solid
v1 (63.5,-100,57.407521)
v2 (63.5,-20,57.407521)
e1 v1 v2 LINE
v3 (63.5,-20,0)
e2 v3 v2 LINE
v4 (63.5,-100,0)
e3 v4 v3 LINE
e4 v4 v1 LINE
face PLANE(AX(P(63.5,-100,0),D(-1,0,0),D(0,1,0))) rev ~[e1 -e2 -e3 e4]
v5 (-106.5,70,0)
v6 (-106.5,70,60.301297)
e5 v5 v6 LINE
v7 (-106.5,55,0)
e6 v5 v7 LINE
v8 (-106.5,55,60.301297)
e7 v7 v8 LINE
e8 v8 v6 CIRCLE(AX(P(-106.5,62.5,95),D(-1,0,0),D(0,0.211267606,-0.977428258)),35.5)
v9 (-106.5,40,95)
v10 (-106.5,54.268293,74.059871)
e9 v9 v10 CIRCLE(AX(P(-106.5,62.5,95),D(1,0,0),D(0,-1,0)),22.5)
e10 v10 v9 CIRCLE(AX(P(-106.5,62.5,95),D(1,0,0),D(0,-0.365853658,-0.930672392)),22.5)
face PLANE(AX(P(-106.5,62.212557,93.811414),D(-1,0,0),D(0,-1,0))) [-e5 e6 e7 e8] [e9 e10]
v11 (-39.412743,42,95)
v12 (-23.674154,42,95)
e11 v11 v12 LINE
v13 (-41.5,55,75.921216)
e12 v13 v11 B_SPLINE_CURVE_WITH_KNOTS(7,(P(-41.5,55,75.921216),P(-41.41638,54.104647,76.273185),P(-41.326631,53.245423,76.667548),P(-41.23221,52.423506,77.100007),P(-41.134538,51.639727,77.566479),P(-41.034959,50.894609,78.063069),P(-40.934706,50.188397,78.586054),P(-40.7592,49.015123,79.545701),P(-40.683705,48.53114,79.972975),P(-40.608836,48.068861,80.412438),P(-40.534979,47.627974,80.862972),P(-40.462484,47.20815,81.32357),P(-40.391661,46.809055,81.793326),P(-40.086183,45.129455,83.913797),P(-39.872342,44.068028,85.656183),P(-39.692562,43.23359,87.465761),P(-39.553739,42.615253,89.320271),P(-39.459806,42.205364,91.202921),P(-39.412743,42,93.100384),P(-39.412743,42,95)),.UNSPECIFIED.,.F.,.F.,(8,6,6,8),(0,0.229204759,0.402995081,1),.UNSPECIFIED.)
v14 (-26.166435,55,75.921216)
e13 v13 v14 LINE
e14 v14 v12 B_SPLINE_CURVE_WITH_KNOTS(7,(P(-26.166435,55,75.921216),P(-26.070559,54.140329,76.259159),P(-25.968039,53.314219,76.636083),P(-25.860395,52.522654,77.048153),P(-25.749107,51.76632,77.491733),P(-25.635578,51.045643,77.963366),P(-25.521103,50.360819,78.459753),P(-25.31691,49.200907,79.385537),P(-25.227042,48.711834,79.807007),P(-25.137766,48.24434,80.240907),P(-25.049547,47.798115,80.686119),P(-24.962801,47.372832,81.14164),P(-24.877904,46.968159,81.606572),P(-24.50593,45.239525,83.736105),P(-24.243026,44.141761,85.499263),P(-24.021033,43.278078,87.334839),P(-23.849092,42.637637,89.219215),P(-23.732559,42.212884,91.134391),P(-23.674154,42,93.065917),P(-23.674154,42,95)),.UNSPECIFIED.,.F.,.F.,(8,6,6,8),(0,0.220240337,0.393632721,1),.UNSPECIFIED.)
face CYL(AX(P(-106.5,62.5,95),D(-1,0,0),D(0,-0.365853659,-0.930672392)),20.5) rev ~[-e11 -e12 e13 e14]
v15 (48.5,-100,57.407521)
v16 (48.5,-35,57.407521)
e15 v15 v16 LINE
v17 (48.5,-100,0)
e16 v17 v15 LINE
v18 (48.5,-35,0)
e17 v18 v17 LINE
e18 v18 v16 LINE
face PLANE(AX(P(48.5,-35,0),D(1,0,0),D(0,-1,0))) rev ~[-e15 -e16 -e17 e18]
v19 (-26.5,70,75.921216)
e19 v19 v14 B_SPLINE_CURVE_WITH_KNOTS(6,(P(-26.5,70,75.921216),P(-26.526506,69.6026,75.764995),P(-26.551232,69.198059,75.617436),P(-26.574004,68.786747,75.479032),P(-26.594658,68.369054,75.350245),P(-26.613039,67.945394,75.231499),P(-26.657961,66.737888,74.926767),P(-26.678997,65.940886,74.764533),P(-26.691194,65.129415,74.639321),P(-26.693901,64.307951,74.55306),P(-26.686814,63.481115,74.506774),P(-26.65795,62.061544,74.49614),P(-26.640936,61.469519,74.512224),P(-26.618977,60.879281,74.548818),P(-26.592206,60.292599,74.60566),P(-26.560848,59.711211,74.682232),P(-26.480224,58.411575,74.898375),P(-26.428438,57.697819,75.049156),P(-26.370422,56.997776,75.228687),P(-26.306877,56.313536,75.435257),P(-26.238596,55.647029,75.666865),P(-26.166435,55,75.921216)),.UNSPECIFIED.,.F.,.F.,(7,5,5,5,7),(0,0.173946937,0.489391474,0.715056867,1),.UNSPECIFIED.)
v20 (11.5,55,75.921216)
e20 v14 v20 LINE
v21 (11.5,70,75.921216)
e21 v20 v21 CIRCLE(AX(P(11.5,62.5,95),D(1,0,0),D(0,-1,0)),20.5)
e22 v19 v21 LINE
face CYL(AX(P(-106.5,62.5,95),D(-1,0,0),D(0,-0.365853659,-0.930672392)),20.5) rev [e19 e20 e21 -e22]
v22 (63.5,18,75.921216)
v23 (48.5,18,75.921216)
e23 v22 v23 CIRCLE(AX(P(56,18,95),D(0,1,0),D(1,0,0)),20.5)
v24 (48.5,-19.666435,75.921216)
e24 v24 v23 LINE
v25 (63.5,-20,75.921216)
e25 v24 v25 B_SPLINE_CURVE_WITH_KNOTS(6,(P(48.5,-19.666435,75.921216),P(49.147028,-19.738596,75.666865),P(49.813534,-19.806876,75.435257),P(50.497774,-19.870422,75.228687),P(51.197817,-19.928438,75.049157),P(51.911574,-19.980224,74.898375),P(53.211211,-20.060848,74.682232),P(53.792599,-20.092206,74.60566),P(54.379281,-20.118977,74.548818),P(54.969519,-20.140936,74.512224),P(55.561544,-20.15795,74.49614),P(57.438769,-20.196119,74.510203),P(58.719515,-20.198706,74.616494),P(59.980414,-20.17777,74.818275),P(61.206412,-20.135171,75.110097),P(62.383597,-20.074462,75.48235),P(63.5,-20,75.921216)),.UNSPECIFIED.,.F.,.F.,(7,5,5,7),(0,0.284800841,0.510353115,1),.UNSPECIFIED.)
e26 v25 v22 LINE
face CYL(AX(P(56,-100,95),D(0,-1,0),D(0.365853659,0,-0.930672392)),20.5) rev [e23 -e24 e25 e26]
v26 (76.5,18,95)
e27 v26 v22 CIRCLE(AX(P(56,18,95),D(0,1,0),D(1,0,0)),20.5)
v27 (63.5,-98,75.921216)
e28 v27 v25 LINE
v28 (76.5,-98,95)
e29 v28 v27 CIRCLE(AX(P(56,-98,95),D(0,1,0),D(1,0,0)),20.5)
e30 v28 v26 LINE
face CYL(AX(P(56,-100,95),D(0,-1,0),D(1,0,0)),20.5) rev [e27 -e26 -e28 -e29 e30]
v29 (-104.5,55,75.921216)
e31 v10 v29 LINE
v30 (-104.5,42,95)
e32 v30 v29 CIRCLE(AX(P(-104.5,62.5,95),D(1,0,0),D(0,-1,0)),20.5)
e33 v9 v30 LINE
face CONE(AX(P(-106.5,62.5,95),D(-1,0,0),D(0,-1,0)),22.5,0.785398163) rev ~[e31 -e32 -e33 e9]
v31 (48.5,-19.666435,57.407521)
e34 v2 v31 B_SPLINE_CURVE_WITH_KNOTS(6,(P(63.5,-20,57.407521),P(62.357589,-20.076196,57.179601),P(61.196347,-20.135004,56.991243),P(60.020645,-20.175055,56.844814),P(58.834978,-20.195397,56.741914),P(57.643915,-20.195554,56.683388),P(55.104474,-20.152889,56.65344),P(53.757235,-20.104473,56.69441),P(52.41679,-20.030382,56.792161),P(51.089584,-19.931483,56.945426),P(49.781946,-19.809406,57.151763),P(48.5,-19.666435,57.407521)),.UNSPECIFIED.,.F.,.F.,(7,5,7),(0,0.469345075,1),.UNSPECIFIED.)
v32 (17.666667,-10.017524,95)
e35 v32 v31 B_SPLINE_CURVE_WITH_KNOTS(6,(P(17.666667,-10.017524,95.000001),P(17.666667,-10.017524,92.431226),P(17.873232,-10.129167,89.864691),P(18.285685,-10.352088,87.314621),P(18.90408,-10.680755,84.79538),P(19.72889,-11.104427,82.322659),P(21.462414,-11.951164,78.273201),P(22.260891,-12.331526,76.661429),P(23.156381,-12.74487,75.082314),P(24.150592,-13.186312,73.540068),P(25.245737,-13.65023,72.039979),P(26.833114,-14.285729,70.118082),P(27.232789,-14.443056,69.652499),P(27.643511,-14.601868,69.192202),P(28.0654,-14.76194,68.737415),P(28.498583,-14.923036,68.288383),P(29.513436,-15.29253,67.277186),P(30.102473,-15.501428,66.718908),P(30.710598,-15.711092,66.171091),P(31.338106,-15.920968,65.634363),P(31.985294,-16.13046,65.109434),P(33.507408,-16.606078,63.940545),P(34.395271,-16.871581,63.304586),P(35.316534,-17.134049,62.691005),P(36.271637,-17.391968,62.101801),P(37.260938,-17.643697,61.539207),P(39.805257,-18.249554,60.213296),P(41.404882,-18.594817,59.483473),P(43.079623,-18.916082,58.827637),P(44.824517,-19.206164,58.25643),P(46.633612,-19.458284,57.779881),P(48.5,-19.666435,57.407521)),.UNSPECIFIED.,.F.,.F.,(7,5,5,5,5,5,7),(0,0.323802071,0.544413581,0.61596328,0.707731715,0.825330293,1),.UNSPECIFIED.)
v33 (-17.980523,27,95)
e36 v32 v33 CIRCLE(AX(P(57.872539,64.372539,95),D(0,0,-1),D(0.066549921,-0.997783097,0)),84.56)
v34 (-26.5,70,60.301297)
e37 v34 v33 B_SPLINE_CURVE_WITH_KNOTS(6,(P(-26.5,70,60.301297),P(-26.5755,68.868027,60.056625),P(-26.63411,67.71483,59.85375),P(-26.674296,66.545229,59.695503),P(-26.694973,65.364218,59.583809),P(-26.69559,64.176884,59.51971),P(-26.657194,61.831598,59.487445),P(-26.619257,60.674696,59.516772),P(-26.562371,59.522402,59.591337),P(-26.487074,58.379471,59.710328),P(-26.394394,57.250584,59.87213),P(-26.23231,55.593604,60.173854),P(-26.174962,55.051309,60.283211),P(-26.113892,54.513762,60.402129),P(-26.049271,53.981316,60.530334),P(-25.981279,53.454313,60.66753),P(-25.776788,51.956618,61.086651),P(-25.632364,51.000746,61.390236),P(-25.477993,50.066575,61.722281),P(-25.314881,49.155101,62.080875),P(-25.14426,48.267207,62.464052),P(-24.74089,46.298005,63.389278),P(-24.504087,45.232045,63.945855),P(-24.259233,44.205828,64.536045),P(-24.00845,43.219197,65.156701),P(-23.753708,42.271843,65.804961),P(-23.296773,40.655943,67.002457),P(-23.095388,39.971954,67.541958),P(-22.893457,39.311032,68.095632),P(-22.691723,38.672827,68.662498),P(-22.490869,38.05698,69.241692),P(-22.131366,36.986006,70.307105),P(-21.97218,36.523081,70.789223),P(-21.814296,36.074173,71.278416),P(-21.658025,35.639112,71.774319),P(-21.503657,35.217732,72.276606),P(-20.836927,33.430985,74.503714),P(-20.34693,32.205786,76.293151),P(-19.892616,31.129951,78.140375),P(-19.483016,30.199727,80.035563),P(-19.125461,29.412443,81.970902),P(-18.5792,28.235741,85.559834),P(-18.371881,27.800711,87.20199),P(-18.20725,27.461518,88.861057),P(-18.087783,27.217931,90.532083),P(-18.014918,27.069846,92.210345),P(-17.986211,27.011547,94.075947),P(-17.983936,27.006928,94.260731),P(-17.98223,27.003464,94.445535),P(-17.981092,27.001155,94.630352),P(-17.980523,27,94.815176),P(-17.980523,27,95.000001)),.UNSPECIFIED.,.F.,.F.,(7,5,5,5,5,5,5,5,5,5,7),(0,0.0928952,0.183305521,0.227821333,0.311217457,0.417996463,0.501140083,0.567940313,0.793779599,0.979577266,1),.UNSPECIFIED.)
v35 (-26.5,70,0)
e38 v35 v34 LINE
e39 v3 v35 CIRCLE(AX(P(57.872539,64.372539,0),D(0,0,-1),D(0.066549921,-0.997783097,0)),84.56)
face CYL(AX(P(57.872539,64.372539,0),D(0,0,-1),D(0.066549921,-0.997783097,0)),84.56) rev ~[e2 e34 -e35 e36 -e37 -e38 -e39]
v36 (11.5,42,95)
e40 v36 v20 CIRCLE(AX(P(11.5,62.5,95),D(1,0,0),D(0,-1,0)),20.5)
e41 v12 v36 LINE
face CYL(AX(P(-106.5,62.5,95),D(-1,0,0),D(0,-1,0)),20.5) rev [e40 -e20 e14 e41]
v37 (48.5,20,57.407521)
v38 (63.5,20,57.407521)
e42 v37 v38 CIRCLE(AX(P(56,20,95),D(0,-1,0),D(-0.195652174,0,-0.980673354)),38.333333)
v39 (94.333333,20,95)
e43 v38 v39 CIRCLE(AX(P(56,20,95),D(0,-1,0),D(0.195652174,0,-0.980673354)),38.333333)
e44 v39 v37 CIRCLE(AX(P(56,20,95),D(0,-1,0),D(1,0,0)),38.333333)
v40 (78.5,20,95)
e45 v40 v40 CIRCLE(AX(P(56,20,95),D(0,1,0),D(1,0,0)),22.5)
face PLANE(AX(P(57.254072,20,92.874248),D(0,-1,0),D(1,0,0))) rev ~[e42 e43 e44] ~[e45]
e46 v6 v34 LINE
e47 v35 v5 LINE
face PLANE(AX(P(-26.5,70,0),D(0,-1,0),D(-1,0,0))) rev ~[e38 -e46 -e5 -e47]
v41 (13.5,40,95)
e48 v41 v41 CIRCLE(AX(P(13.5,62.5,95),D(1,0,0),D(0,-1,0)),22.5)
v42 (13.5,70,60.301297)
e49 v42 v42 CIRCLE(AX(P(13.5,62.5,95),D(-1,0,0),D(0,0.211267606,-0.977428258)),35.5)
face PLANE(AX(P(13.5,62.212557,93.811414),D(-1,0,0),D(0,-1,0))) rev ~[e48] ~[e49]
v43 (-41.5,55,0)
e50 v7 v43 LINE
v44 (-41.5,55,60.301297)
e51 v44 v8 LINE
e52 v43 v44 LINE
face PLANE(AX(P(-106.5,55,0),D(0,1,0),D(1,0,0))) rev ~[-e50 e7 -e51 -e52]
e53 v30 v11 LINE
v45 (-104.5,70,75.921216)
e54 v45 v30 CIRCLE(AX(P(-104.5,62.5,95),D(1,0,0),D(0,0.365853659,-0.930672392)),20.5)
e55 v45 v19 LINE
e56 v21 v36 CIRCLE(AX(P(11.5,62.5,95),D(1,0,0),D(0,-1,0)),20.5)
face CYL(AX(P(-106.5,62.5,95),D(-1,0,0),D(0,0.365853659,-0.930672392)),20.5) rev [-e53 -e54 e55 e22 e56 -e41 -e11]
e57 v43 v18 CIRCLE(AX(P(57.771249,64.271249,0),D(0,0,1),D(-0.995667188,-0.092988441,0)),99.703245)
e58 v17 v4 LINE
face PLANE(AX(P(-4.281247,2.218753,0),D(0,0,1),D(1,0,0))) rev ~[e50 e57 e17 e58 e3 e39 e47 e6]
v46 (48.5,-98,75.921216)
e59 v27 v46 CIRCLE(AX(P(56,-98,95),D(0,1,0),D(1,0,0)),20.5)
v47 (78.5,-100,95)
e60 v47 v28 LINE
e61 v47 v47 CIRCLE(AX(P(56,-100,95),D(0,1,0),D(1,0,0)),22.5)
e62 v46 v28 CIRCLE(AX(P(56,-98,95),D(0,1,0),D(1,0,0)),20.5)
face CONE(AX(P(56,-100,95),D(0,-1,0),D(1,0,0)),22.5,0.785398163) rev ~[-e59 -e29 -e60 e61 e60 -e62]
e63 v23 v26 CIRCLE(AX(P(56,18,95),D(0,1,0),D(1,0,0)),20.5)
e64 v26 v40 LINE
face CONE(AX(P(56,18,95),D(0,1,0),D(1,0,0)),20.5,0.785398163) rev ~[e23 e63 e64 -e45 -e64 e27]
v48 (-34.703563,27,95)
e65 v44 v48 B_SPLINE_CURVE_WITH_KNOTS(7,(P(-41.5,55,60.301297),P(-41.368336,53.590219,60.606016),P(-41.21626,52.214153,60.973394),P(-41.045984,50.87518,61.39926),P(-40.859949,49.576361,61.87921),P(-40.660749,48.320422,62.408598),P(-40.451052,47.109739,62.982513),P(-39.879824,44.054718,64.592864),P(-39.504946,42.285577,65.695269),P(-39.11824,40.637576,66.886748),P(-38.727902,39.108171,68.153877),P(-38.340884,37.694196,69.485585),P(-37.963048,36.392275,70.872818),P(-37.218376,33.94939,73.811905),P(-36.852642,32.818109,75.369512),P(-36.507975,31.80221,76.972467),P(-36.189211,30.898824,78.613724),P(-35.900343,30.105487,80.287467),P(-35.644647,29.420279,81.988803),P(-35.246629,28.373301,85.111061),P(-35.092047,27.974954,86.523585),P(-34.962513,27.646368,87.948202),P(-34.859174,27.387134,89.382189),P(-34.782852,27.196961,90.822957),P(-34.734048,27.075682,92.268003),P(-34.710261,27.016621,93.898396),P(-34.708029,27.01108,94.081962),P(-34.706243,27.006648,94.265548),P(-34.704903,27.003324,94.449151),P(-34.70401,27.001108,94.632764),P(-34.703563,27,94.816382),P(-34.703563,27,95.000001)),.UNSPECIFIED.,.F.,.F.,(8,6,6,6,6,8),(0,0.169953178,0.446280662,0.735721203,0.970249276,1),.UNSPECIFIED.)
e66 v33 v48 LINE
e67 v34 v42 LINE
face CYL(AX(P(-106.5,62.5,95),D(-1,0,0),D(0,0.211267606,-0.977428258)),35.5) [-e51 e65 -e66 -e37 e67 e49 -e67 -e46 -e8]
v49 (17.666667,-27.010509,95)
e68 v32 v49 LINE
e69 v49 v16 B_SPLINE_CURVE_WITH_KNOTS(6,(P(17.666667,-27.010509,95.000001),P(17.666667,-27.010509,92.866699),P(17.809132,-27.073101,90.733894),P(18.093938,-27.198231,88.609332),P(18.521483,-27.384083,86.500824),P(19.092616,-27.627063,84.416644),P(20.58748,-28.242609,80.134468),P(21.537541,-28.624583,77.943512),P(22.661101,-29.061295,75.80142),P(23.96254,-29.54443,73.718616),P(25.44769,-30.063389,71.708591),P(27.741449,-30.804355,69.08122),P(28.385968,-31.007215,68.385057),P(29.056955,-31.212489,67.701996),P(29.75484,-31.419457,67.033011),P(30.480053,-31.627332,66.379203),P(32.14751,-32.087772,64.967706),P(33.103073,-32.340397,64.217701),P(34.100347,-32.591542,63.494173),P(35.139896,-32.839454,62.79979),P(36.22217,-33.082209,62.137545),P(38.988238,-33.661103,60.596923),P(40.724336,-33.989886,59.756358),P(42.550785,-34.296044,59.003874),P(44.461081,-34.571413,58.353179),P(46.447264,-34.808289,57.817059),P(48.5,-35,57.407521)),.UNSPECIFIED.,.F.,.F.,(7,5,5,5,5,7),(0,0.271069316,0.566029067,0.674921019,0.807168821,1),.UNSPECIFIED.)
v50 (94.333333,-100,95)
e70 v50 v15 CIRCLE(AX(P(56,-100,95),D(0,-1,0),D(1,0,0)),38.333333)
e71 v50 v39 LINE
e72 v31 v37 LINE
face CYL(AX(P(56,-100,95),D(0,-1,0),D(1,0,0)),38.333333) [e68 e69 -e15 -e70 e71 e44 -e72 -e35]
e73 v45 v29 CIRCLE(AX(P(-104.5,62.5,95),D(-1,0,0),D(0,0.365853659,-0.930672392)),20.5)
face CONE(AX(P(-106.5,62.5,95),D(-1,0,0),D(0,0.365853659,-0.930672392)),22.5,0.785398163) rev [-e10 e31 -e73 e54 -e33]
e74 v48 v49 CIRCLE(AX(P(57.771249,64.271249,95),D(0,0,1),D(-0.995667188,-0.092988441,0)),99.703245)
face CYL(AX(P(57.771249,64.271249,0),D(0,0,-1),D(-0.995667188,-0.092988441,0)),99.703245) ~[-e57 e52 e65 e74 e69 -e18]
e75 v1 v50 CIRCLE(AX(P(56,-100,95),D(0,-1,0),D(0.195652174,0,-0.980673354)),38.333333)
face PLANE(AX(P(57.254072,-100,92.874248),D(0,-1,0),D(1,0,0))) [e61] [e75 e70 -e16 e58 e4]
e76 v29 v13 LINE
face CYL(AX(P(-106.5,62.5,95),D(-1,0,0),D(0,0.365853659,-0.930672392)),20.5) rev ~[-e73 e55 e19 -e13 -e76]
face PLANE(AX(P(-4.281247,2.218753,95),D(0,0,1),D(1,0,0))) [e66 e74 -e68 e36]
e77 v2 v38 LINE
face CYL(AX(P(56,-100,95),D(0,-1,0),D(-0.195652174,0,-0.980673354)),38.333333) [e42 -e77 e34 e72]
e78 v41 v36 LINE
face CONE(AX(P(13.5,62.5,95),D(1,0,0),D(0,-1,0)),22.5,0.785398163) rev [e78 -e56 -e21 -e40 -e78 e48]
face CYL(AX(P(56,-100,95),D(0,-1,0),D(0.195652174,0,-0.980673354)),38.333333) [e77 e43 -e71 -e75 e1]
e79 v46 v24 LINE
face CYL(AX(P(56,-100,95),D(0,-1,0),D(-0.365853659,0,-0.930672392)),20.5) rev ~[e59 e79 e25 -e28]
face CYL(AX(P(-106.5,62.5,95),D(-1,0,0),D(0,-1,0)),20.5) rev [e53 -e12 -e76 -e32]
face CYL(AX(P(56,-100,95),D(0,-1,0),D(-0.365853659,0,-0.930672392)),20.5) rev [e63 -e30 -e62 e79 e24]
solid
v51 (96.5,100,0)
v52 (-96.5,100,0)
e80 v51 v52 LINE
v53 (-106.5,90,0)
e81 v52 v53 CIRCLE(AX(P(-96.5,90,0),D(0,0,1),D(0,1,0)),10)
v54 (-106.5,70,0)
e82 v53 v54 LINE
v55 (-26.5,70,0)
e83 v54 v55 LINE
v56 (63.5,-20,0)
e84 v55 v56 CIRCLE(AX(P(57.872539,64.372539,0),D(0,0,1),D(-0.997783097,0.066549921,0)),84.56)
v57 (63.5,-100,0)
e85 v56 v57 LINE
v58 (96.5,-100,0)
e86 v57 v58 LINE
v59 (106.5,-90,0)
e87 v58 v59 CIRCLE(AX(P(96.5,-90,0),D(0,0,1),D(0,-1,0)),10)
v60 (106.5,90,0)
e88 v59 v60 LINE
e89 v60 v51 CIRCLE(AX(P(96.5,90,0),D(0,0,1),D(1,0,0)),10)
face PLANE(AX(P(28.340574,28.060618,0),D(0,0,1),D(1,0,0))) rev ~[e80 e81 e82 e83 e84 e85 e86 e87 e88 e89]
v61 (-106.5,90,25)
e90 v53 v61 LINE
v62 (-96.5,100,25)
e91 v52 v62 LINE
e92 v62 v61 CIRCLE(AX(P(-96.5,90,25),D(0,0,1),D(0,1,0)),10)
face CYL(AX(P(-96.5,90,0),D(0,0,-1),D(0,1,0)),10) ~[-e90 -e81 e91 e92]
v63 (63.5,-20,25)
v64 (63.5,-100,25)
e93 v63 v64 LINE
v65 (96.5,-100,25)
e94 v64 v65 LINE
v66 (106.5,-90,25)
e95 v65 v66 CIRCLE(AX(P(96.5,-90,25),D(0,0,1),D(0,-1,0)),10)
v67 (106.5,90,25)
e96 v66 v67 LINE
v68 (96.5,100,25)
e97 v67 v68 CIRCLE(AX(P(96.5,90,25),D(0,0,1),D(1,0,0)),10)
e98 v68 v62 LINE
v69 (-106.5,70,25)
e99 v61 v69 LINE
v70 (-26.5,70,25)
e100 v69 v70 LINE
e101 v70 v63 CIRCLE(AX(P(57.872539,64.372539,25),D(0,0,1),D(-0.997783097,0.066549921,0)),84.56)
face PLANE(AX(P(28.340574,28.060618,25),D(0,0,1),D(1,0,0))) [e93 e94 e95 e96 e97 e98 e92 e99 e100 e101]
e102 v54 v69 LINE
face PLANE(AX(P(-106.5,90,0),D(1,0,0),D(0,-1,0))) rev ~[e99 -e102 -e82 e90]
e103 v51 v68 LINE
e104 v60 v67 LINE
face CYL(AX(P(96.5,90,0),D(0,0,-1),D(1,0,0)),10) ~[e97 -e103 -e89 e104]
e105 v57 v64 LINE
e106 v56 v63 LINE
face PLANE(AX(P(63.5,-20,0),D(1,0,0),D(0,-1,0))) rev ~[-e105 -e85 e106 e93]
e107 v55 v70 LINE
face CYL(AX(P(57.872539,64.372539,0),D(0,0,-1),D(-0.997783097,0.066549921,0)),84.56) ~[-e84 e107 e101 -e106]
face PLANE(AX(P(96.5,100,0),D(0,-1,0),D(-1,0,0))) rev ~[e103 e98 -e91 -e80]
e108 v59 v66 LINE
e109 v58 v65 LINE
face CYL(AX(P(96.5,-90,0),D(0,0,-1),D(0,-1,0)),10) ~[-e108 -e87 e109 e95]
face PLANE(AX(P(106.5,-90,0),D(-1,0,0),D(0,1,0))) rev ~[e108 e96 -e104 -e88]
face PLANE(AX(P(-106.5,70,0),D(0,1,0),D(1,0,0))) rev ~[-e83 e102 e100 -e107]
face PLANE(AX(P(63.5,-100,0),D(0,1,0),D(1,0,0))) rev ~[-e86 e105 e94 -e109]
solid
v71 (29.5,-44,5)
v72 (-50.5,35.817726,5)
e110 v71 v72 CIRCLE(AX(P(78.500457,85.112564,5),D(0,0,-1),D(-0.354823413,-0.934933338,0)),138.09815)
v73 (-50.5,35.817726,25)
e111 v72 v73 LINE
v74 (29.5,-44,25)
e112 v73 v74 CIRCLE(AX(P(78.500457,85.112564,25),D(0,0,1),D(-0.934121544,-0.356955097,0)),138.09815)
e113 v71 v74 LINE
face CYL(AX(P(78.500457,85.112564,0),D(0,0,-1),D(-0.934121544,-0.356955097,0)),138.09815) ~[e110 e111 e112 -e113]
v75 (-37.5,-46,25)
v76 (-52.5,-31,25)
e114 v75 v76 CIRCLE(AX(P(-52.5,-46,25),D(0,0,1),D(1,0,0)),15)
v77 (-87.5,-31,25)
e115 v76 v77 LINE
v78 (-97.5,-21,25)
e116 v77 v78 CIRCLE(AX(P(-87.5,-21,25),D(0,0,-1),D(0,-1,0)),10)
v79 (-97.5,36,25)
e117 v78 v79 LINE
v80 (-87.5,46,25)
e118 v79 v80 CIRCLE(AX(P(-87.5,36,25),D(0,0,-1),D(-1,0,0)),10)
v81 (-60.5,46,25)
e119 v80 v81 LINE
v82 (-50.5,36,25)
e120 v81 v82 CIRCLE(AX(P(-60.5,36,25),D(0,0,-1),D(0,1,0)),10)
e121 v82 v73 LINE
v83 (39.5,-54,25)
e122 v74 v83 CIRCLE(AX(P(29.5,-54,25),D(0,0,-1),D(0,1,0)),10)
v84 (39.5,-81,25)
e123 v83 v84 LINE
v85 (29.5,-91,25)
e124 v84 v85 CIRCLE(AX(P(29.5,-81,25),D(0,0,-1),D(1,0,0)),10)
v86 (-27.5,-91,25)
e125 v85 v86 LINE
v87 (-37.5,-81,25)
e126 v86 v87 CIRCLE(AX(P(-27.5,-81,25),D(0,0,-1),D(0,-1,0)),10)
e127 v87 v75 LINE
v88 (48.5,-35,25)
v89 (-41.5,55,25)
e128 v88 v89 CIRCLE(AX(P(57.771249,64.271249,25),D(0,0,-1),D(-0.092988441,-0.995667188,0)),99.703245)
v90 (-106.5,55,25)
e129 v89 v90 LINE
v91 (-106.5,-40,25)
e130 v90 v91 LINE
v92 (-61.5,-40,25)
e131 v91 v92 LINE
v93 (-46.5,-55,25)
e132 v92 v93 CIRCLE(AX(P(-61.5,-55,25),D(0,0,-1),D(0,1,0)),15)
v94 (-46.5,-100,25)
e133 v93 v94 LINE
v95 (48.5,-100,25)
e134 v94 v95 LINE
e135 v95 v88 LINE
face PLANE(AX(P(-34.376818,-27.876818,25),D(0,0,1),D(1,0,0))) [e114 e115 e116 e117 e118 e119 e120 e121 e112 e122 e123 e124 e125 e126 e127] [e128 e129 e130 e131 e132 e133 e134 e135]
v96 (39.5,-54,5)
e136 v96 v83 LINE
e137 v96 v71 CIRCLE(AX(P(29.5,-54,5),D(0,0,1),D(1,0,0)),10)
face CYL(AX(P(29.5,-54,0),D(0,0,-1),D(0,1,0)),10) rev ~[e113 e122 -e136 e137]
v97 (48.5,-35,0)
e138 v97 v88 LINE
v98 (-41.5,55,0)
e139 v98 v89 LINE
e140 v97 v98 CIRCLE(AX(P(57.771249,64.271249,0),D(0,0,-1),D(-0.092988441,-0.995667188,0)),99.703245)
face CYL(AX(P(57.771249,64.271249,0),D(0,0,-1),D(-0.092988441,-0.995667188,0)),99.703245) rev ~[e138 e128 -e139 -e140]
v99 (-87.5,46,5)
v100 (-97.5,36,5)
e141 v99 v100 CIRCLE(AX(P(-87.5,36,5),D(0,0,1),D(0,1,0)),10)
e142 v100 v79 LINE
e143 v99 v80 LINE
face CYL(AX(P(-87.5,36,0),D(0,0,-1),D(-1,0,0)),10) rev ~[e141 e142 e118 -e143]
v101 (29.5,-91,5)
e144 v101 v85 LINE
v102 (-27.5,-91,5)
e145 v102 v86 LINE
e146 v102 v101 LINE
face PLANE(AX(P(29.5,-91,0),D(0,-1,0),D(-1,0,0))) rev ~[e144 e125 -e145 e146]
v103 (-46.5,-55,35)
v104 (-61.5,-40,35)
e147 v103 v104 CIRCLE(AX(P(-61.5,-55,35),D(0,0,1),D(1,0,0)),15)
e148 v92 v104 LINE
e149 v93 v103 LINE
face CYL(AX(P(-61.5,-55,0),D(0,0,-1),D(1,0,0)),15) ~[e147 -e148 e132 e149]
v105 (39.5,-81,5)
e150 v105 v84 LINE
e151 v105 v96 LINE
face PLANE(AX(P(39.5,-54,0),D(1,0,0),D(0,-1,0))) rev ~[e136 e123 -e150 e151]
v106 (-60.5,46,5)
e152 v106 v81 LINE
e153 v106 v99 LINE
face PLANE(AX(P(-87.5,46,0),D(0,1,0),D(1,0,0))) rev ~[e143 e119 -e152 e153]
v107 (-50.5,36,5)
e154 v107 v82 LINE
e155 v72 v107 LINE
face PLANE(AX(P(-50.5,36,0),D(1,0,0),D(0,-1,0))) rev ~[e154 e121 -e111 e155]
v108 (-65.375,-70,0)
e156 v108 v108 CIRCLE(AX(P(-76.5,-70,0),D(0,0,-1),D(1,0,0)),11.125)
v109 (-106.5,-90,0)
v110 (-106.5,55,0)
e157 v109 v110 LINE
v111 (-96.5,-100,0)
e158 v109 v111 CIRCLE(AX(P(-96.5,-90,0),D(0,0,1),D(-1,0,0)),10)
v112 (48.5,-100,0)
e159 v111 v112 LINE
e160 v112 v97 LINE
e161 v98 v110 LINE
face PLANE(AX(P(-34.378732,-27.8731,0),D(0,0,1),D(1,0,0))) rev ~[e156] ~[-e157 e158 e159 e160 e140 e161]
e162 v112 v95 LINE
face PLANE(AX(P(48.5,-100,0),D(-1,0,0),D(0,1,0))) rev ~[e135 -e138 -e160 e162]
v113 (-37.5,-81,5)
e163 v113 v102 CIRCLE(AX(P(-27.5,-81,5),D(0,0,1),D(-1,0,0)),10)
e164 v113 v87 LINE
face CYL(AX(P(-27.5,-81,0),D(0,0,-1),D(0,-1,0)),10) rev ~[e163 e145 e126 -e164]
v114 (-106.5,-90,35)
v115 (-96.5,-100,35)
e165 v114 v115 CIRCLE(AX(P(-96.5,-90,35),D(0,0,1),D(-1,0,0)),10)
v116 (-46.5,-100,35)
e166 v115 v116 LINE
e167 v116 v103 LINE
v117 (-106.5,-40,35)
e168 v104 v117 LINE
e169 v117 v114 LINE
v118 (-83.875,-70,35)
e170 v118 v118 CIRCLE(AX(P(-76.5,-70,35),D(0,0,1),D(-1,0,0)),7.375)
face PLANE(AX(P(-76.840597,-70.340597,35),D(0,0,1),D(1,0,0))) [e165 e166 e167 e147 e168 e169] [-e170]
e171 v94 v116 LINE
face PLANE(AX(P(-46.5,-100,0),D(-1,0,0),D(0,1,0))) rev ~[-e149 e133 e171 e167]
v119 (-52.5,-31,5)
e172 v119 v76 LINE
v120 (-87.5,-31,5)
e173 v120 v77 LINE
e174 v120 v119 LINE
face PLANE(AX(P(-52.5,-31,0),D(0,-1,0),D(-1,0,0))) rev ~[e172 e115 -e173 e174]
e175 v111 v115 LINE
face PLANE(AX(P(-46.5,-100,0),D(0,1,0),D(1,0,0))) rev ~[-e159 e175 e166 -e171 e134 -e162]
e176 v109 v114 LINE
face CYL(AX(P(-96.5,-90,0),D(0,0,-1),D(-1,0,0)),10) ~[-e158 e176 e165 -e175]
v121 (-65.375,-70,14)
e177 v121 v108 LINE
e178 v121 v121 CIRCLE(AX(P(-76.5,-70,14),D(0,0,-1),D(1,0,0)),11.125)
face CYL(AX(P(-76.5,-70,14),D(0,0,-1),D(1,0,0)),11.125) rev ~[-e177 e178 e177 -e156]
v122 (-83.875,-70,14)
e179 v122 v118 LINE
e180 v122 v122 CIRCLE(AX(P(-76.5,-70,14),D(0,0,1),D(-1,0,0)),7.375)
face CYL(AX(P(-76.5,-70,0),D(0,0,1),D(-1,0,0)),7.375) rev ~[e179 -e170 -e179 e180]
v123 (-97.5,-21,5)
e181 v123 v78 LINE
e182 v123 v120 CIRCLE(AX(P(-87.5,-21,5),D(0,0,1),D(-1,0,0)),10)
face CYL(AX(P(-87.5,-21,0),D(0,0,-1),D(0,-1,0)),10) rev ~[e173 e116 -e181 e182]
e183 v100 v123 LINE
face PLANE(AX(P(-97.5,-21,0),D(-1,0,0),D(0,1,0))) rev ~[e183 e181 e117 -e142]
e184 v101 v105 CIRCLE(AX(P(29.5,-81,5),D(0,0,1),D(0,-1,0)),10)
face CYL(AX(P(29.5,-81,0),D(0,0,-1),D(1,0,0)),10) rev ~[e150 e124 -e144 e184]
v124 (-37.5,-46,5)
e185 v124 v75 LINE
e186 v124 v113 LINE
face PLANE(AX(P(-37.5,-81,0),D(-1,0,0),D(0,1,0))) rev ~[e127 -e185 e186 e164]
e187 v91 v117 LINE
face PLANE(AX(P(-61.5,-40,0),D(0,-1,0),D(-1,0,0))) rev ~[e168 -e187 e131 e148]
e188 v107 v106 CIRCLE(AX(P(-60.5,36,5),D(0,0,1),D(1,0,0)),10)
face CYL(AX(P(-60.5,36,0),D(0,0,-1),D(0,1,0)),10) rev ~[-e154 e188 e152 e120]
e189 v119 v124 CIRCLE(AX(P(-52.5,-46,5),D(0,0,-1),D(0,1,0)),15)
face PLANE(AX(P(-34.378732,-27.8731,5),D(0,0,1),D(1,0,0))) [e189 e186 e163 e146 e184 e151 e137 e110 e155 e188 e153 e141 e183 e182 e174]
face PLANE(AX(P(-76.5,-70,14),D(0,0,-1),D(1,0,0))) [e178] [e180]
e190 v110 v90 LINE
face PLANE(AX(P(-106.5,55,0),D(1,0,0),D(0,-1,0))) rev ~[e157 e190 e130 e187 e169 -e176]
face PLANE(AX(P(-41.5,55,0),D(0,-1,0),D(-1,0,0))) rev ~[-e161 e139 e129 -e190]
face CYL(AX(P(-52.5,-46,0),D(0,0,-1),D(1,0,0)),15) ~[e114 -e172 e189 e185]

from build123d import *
from build123d import SkipClean  # not in build123d's __all__

# Parameters (mm, degrees)
F1_DEPTH       = 35
F2_DEPTH       = 25
F3_DEPTH       = 95
F4_DEPTH       = 5
F5_D           = 14.75
F5_CBORE_D     = 22.25
F5_CBORE_DEPTH = 14
F7_DEPTH       = 120
F8_DEPTH       = 120
F10_DEPTH      = 120
F11_DEPTH      = 120
F12_T2_ANGLE   = 42.9202554989
F12_T4_ANGLE   = 248.5398722506
F12_T6_ANGLE   = 68.5398722506


# Not quite as in the source:
# - a fillet or chamfer that OpenCascade refuses, or shapes differently, is made with other operations: its cross-section is extruded or revolved along the edge and cut away or added


with BuildPart() as f1:
    # F0 (on Top) → F1 (new body)
    with BuildSketch(Plane.XY):
        with BuildLine():
            Line((-96.5, -100), (-46.5, -100))
            Line((-46.5, -100), (-46.5, -55))
            ThreePointArc((-46.5, -55), (-50.8933982822, -44.3933982822), (-61.5, -40))
            Line((-61.5, -40), (-106.5, -40))
            Line((-106.5, -40), (-106.5, -90))
            ThreePointArc((-106.5, -90), (-103.5710678119, -97.0710678119), (-96.5, -100))
        make_face()
    extrude(amount=F1_DEPTH)

    # F0 (on Top) → F2 (join)
    with BuildSketch(Plane.XY):
        with BuildLine():
            Line((-46.5, -100), (48.5, -100))
            Line((48.5, -100), (48.5, -35))
            ThreePointArc((48.5, -35), (-12.7295911164, -6.2295911164), (-41.5, 55))
            Line((-41.5, 55), (-106.5, 55))
            Line((-106.5, 55), (-106.5, -40))
            Line((-106.5, -40), (-61.5, -40))
            ThreePointArc((-61.5, -40), (-50.8933982822, -44.3933982822), (-46.5, -55))
            Line((-46.5, -55), (-46.5, -100))
        make_face()
        with BuildLine():
            Line((-97.5, -21), (-97.5, 36))
            ThreePointArc((-97.5, 36), (-94.5710678119, 43.0710678119), (-87.5, 46))
            Line((-87.5, 46), (-60.5, 46))
            ThreePointArc((-60.5, 46), (-53.4289321881, 43.0710678119), (-50.5, 36))
            Line((-50.5, 36), (-50.5, 35.8177255686))
            ThreePointArc((-50.5, 35.8177255686), (-19.0382464985, -12.6488819399), (29.5, -44))
            ThreePointArc((29.5, -44), (36.5710678119, -46.9289321881), (39.5, -54))
            Line((39.5, -54), (39.5, -81))
            ThreePointArc((39.5, -81), (36.5710678119, -88.0710678119), (29.5, -91))
            Line((29.5, -91), (-27.5, -91))
            ThreePointArc((-27.5, -91), (-34.5710678119, -88.0710678119), (-37.5, -81))
            Line((-37.5, -81), (-37.5, -46))
            ThreePointArc((-37.5, -46), (-41.8933982822, -35.3933982822), (-52.5, -31))
            Line((-52.5, -31), (-87.5, -31))
            ThreePointArc((-87.5, -31), (-94.5710678119, -28.0710678119), (-97.5, -21))
        make_face(mode=Mode.SUBTRACT)
    extrude(amount=F2_DEPTH)

    # F0 (on Top) → F4 (join)
    with BuildSketch(Plane.XY):
        with BuildLine():
            ThreePointArc((-87.5, 46), (-94.5710678119, 43.0710678119), (-97.5, 36))
            Line((-97.5, 36), (-97.5, -21))
            ThreePointArc((-97.5, -21), (-94.5710678119, -28.0710678119), (-87.5, -31))
            Line((-87.5, -31), (-52.5, -31))
            ThreePointArc((-52.5, -31), (-41.8933982822, -35.3933982822), (-37.5, -46))
            Line((-37.5, -46), (-37.5, -81))
            ThreePointArc((-37.5, -81), (-34.5710678119, -88.0710678119), (-27.5, -91))
            Line((-27.5, -91), (29.5, -91))
            ThreePointArc((29.5, -91), (36.5710678119, -88.0710678119), (39.5, -81))
            Line((39.5, -81), (39.5, -54))
            ThreePointArc((39.5, -54), (36.5710678119, -46.9289321881), (29.5, -44))
            ThreePointArc((29.5, -44), (-19.0382464985, -12.6488819399), (-50.5, 35.8177255686))
            Line((-50.5, 35.8177255686), (-50.5, 36))
            ThreePointArc((-50.5, 36), (-53.4289321881, 43.0710678119), (-60.5, 46))
            Line((-60.5, 46), (-87.5, 46))
        make_face()
    extrude(amount=F4_DEPTH)

    # F5 (through all)
    with Locations(Plane(origin=(0, 0, 0), x_dir=(1, 0, 0), z_dir=(0, 0, -1))):
        with Locations((-76.5, 70)):
            CounterBoreHole(F5_D / 2, F5_CBORE_D / 2, F5_CBORE_DEPTH)


with BuildPart() as f2:
    # F0 (on Top) → F2, piece 2 (new body)
    with BuildSketch(Plane.XY):
        with BuildLine():
            Line((63.5, -100), (96.5, -100))
            ThreePointArc((96.5, -100), (103.5710678119, -97.0710678119), (106.5, -90))
            Line((106.5, -90), (106.5, 90))
            ThreePointArc((106.5, 90), (103.5710678119, 97.0710678119), (96.5, 100))
            Line((96.5, 100), (-96.5, 100))
            ThreePointArc((-96.5, 100), (-103.5710678119, 97.0710678119), (-106.5, 90))
            Line((-106.5, 90), (-106.5, 70))
            Line((-106.5, 70), (-26.5, 70))
            ThreePointArc((-26.5, 70), (-1.9204107639, 4.5795892361), (63.5, -20))
            Line((63.5, -20), (63.5, -100))
        make_face()
    extrude(amount=F2_DEPTH)


with BuildPart() as f3:
    # F0 (on Top) → F3 (new body)
    with BuildSketch(Plane.XY):
        with BuildLine():
            Line((48.5, -100), (63.5, -100))
            Line((63.5, -100), (63.5, -20))
            ThreePointArc((63.5, -20), (-1.9204107639, 4.5795892361), (-26.5, 70))
            Line((-26.5, 70), (-106.5, 70))
            Line((-106.5, 70), (-106.5, 55))
            Line((-106.5, 55), (-41.5, 55))
            ThreePointArc((-41.5, 55), (-12.7295911164, -6.2295911164), (48.5, -35))
            Line((48.5, -35), (48.5, -100))
        make_face()
    extrude(amount=F3_DEPTH)

    # F6 (on face) → F7 (cut)
    with BuildSketch(Plane.XZ.offset(100)):
        with BuildLine():
            Line((63.5, 75.9212159717), (63.5, 95))
            Line((63.5, 95), (48.5, 95))
            Line((48.5, 95), (48.5, 75.9212159717))
            ThreePointArc((48.5, 75.9212159717), (56, 74.5), (63.5, 75.9212159717))
        make_face()
        with BuildLine():
            Line((48.5, 95), (63.5, 95))
            Line((63.5, 95), (63.5, 75.9212159717))
            ThreePointArc((63.5, 75.9212159717), (72.9410743461, 83.4566036194), (76.5, 95))
            ThreePointArc((76.5, 95), (44.4566036194, 111.9410743461), (48.5, 75.9212159717))
            Line((48.5, 75.9212159717), (48.5, 95))
        make_face()
    extrude(amount=-F7_DEPTH, mode=Mode.SUBTRACT)

    # F6 (on face) → F8 (join)
    with BuildSketch(Plane.XZ.offset(100)):
        with BuildLine():
            ThreePointArc((76.5, 95), (72.9410743461, 83.4566036194), (63.5, 75.9212159717))
            Line((63.5, 75.9212159717), (63.5, 57.4075214209))
            ThreePointArc((63.5, 57.4075214209), (85.6390320848, 70.6900797451), (94.33333335, 95))
            ThreePointArc((94.33333335, 95), (31.6900797451, 124.6390320848), (48.5, 57.4075214209))
            Line((48.5, 57.4075214209), (48.5, 75.9212159717))
            ThreePointArc((48.5, 75.9212159717), (44.4566036194, 111.9410743461), (76.5, 95))
        make_face()
        with BuildLine():
            Line((63.5, 57.4075214209), (63.5, 75.9212159717))
            ThreePointArc((63.5, 75.9212159717), (56, 74.5), (48.5, 75.9212159717))
            Line((48.5, 75.9212159717), (48.5, 57.4075214209))
            ThreePointArc((48.5, 57.4075214209), (56, 56.66666665), (63.5, 57.4075214209))
        make_face()
    extrude(amount=-F8_DEPTH)

    # F9 (on face) → F10 (cut)
    with BuildSketch(Plane(origin=(-106.5, 0, 0), x_dir=(0, -1, 0), z_dir=(-1, 0, 0))):
        with BuildLine():
            Line((-55, 75.9212159717), (-55, 95))
            Line((-55, 95), (-70, 95))
            Line((-70, 95), (-70, 75.9212159717))
            ThreePointArc((-70, 75.9212159717), (-62.5, 74.5), (-55, 75.9212159717))
        make_face()
        with BuildLine():
            Line((-70, 95), (-55, 95))
            Line((-55, 95), (-55, 75.9212159717))
            ThreePointArc((-55, 75.9212159717), (-45.5589256539, 83.4566036194), (-42, 95))
            ThreePointArc((-42, 95), (-74.0433963806, 111.9410743461), (-70, 75.9212159717))
            Line((-70, 75.9212159717), (-70, 95))
        make_face()
    extrude(amount=-F10_DEPTH, mode=Mode.SUBTRACT)

    # F9 (on face) → F11 (join)
    with BuildSketch(Plane(origin=(-106.5, 0, 0), x_dir=(0, -1, 0), z_dir=(-1, 0, 0))):
        with BuildLine():
            ThreePointArc((-42, 95), (-45.5589256539, 83.4566036194), (-55, 75.9212159717))
            Line((-55, 75.9212159717), (-55, 60.3012968542))
            ThreePointArc((-55, 60.3012968542), (-34.8730204329, 72.7065031904), (-27, 95))
            ThreePointArc((-27, 95), (-84.7934968096, 122.6269795671), (-70, 60.3012968542))
            Line((-70, 60.3012968542), (-70, 75.9212159717))
            ThreePointArc((-70, 75.9212159717), (-74.0433963806, 111.9410743461), (-42, 95))
        make_face()
        with BuildLine():
            Line((-55, 60.3012968542), (-55, 75.9212159717))
            ThreePointArc((-55, 75.9212159717), (-62.5, 74.5), (-70, 75.9212159717))
            Line((-70, 75.9212159717), (-70, 60.3012968542))
            ThreePointArc((-70, 60.3012968542), (-62.5, 59.5), (-55, 60.3012968542))
        make_face()
    with SkipClean():  # cleaning this boolean's faces spoils the solid; the shape is the same uncleaned
        extrude(amount=-F11_DEPTH)

    # F12: chamfer of 2 on 6 edges, made by hand

    # F12_s1 → F12_t2 (revolve, cut)
    with BuildSketch(Plane(origin=(0, 86.4809842241, 33.9962641601), x_dir=(1, 0, 0), z_dir=(0, 0.9306723916, 0.3658536585))):
        Polygon((-106.5, -43.048023546), (-104.5, -45.048023546), (-106.5, -45.048023546), align=None)
    revolve(axis=Axis((-106.5, 62.5, 95), (-1, 0, 0)), revolution_arc=F12_T2_ANGLE, mode=Mode.SUBTRACT)

    # F12_s3 → F12_t4 (revolve, cut)
    with BuildSketch(Plane(origin=(0, 86.4809842241, 33.9962641601), x_dir=(1, 0, 0), z_dir=(0, -0.9306723916, -0.3658536585))):
        Polygon((-106.5, 43.048023546), (-104.5, 45.048023546), (-106.5, 45.048023546), align=None)
    revolve(axis=Axis((-106.5, 62.5, 95), (1, 0, 0)), revolution_arc=F12_T4_ANGLE, mode=Mode.SUBTRACT)

    # F12_s5 → F12_t6 (revolve, cut)
    with BuildSketch(Plane.XY.offset(95)):
        Polygon((-106.5, 40), (-104.5, 42), (-106.5, 42), align=None)
    revolve(axis=Axis((-106.5, 62.5, 95), (1, 0, 0)), revolution_arc=F12_T6_ANGLE, mode=Mode.SUBTRACT)

    # F12_s7 → F12_t8 (revolve, cut)
    with BuildSketch(Plane.XY.offset(95)):
        Polygon((13.5, 40), (11.5, 42), (13.5, 42), align=None)
    revolve(axis=Axis((13.5, 62.5, 95), (1, 0, 0)), mode=Mode.SUBTRACT)

    # F12_s9 → F12_t10 (revolve, cut)
    with BuildSketch(Plane.XY.offset(95)):
        Polygon((76.5, 18), (78.5, 20), (76.5, 20), align=None)
    revolve(axis=Axis((56, 20, 95), (0, 1, 0)), mode=Mode.SUBTRACT)

    # F12_s11 → F12_t12 (revolve, cut)
    with BuildSketch(Plane.XY.offset(95)):
        Polygon((78.5, -100), (76.5, -98), (76.5, -100), align=None)
    revolve(axis=Axis((56, -100, 95), (0, 1, 0)), mode=Mode.SUBTRACT)


solid = Compound([f1.part, f2.part, f3.part])
